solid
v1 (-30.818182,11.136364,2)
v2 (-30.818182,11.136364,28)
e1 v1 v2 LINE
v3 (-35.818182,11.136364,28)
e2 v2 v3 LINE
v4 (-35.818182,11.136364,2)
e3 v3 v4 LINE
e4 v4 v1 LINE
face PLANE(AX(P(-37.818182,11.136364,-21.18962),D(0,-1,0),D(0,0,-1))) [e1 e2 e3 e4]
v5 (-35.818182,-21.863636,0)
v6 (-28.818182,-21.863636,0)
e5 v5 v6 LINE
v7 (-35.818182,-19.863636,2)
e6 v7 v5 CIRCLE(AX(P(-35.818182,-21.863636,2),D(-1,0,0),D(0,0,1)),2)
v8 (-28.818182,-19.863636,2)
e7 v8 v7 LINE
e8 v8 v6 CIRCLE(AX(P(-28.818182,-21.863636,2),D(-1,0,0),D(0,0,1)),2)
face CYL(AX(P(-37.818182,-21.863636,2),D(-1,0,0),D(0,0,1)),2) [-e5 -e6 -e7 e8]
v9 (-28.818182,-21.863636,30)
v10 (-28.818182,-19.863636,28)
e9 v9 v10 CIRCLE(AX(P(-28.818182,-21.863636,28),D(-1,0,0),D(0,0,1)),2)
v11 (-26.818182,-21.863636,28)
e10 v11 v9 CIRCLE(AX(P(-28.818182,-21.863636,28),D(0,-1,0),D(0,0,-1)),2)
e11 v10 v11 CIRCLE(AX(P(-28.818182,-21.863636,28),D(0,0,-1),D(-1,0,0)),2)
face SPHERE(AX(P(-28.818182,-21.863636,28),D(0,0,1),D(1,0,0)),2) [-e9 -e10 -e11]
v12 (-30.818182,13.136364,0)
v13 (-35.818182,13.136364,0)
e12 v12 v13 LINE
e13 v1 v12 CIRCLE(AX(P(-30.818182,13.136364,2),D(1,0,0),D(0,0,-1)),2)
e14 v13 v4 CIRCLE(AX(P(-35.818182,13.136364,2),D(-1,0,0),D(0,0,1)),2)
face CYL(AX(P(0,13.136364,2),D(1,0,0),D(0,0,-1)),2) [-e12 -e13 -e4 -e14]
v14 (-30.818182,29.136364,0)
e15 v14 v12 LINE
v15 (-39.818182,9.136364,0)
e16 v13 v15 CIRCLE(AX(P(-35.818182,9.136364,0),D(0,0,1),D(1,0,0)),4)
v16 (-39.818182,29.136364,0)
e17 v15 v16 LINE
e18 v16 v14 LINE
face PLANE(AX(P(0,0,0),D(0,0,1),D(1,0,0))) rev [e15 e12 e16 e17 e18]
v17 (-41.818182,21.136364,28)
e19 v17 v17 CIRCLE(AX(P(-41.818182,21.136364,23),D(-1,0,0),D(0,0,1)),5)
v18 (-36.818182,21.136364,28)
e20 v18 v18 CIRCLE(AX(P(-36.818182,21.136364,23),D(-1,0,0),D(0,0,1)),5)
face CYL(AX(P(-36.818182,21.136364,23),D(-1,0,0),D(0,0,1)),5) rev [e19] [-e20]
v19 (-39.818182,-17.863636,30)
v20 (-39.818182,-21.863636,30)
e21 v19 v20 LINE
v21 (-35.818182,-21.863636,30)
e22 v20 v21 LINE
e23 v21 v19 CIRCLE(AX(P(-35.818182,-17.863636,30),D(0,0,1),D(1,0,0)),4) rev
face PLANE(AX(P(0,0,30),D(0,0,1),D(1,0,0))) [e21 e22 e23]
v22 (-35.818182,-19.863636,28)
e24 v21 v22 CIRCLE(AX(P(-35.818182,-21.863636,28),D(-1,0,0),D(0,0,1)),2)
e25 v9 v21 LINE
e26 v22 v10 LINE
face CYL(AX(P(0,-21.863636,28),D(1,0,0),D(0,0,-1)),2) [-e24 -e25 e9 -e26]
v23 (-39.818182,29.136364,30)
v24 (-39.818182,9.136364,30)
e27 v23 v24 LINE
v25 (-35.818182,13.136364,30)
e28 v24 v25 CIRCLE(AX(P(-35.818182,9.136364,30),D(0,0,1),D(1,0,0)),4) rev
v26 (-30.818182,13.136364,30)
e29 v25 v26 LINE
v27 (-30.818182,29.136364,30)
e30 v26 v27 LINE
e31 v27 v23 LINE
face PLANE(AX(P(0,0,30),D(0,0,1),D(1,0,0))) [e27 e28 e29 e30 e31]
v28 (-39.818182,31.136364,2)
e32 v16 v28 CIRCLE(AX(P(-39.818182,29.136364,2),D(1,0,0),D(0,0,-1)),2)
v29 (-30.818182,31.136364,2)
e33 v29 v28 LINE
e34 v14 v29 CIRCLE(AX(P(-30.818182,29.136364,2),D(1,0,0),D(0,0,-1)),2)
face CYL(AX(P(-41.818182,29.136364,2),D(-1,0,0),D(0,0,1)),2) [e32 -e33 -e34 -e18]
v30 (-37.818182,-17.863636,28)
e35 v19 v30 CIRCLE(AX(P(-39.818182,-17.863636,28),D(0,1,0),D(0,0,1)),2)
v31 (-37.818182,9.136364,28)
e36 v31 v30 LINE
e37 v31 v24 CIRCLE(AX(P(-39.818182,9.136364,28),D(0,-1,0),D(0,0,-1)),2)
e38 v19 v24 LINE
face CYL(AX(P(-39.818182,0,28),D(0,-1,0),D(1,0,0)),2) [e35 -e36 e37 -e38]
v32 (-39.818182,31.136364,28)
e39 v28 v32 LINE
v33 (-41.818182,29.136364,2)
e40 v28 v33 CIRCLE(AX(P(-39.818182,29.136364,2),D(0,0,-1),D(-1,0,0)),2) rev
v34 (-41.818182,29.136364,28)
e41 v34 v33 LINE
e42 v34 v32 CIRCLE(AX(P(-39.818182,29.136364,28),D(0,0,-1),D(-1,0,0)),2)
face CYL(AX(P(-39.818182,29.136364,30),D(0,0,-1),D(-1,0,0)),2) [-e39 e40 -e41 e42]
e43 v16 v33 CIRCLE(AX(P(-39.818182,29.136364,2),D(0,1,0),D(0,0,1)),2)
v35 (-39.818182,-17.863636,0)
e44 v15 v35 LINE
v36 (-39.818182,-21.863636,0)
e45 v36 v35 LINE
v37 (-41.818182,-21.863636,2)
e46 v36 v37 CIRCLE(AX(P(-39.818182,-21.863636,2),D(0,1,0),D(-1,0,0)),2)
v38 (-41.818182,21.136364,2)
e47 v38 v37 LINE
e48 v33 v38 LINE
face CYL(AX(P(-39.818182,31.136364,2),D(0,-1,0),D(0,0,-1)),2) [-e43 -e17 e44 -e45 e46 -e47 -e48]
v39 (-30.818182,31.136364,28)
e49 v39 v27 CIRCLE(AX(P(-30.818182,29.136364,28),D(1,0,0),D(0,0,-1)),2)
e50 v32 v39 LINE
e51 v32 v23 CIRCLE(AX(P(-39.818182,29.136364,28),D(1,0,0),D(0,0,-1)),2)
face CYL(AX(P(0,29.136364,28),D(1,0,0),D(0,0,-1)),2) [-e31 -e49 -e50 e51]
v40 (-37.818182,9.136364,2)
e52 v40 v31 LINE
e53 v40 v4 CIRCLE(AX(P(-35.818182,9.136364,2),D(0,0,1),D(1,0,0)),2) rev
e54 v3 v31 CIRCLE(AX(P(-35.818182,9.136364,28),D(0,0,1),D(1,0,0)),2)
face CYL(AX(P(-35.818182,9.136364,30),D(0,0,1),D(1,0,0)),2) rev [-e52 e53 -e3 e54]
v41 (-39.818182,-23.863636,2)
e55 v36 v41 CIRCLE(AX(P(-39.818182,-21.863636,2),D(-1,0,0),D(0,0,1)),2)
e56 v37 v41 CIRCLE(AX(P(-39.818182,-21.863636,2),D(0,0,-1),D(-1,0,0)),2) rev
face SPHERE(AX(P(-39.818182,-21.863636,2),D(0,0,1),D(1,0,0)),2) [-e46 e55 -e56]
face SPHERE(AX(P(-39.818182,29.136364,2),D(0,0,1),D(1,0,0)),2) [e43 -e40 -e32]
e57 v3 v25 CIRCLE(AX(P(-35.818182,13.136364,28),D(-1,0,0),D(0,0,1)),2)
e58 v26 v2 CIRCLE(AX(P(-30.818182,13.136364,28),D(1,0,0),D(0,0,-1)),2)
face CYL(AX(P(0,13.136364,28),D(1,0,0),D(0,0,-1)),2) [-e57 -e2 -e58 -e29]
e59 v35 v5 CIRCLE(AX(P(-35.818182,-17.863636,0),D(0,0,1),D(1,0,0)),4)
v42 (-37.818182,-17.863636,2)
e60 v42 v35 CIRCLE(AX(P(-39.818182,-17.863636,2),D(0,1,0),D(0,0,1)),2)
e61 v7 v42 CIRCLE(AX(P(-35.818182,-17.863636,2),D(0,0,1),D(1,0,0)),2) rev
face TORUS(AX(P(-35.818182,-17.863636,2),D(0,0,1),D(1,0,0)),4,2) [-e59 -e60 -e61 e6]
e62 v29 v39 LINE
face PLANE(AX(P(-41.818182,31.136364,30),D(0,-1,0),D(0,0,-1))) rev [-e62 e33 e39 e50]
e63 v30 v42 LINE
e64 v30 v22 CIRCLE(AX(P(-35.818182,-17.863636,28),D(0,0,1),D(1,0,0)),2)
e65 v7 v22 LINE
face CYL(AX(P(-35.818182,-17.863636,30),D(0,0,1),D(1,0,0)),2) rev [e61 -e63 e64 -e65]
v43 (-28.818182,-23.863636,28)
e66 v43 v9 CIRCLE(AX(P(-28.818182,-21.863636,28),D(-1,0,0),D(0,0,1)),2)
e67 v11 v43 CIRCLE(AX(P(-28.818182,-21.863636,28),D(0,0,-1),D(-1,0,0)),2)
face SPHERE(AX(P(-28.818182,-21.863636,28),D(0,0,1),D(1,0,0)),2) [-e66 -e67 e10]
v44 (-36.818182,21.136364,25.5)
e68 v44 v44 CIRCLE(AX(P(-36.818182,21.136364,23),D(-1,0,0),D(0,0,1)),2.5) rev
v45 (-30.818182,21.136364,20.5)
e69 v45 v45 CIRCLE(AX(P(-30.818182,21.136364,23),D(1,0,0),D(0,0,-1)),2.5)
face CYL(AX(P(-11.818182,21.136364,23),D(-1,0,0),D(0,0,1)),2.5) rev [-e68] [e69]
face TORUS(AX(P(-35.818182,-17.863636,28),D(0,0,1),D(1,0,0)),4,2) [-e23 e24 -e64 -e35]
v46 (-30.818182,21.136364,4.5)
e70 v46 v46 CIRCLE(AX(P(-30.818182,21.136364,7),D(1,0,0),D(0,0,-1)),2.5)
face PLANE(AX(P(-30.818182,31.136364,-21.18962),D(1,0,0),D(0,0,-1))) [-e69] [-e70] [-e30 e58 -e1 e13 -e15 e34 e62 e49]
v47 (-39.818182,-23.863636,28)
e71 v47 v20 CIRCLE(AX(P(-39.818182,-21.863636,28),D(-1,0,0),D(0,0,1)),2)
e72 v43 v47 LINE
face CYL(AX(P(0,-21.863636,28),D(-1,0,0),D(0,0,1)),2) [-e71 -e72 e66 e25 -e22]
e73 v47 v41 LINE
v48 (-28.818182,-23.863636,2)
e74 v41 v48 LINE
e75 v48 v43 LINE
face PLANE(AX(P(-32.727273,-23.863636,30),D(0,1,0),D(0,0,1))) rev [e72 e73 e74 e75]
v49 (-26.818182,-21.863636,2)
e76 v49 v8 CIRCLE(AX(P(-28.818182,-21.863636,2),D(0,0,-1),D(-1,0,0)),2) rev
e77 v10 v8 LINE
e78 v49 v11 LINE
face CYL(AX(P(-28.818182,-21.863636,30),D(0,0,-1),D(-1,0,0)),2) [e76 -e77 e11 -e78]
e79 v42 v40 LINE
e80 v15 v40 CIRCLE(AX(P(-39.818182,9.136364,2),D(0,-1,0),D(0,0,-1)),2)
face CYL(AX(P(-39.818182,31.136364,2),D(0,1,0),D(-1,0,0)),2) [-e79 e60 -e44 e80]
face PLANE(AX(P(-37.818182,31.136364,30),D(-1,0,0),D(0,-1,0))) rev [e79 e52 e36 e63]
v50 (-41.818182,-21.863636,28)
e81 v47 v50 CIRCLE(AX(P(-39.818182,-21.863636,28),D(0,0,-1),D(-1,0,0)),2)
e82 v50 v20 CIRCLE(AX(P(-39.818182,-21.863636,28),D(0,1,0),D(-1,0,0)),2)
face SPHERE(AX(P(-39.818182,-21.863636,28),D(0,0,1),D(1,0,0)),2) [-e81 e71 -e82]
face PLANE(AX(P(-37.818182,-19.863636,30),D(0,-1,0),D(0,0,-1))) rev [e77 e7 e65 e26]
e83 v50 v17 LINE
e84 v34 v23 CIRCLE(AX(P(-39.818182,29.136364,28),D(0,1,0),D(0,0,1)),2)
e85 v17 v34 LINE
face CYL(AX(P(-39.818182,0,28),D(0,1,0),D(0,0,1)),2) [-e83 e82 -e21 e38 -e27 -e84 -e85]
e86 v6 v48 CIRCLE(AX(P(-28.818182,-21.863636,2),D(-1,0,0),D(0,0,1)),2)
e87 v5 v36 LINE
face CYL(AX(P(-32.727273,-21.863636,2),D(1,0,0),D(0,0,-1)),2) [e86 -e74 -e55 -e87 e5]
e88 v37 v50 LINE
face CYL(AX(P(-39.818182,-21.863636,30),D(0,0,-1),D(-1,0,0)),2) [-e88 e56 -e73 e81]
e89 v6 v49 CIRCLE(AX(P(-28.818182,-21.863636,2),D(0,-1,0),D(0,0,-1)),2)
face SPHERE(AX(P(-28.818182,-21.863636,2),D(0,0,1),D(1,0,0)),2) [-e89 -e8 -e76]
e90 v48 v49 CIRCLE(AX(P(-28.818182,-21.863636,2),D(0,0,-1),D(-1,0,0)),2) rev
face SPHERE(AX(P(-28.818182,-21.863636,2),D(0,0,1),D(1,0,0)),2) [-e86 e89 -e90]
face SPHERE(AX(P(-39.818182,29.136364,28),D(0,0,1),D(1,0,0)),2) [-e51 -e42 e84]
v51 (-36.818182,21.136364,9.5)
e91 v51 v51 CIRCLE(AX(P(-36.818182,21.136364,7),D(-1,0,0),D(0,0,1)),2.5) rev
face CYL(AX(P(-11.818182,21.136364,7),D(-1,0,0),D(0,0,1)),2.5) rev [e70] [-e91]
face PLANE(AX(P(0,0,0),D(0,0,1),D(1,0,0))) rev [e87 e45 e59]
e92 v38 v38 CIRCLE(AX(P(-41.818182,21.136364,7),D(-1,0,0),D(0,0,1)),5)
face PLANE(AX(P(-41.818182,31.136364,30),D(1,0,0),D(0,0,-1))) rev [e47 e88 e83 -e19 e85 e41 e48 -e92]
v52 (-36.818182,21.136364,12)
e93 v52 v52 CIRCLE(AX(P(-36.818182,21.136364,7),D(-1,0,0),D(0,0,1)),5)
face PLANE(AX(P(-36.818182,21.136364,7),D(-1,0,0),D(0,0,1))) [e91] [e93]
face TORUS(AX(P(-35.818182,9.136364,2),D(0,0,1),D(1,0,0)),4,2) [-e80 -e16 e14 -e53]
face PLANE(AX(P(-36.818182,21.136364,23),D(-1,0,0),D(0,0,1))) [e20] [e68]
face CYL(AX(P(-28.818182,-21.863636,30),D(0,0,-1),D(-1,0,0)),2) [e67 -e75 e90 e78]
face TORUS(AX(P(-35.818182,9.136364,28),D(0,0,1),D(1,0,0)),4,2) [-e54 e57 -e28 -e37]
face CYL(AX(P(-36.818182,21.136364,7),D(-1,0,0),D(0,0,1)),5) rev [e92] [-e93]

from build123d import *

# Parameters (mm, degrees)
EXTRUDE_1_DEPTH     = 30
SKETCH_3_W          = 7
SKETCH_3_H          = 20
EXTRUDE_2_DEPTH     = 30
SKETCH_2_R          = 2.5
CUT_EXTRUDE_1_DEPTH = 30
FILLET_1_R          = 2
FILLET_2_R          = 2
FILLET_3_R          = 2
FILLET_5_R          = 2
SKETCH_4_R          = 5
CUT_EXTRUDE_2_DEPTH = 5


with BuildPart() as part:
    # 스케치1 → 보스-돌출1 (new body)
    with BuildSketch(Plane.XY):
        Polygon((-41.818181818, 31.136363636), (-37.818181818, 31.136363636), (-37.818181818, -19.863636364), (-26.818181818, -19.863636364), (-26.818181818, -23.863636364), (-32.727272727, -23.863636364), (-41.818181818, -23.863636364), align=None)
    extrude(amount=EXTRUDE_1_DEPTH)

    # 스케치3 → 보스-돌출2 (add)
    with BuildSketch(Plane.XY.offset(30)):
        with Locations((-34.318181818, 21.136363636)):
            Rectangle(SKETCH_3_W, SKETCH_3_H)
    extrude(amount=-EXTRUDE_2_DEPTH)

    # 스케치2 → 컷-돌출1 (cut)
    with BuildSketch(Plane.ZY.offset(41.818181818)):
        with Locations((7, 21.136363636)):
            Circle(SKETCH_2_R)
        with Locations((23, 21.136363636)):
            Circle(SKETCH_2_R)
    extrude(amount=-CUT_EXTRUDE_1_DEPTH, mode=Mode.SUBTRACT)

    # 필렛1
    fillet_1_edges = [part.edges().sort_by_distance(p)[0] for p in [
        (-37.818181818, -19.863636364, 15),
        (-37.818181818, 11.136363636, 15),
    ]]
    fillet(fillet_1_edges, radius=FILLET_1_R)

    # 필렛2
    fillet_2_edges = [part.edges().sort_by_distance(p)[0] for p in [
        (-41.818181818, -23.863636364, 15),
    ]]
    fillet(fillet_2_edges, radius=FILLET_2_R)

    # 필렛3
    fillet_3_edges = [part.edges().sort_by_distance(p)[0] for p in [
        (-26.818181818, -23.863636364, 15),
        (-26.818181818, -19.863636364, 15),
        (-41.818181818, 31.136363636, 15),
    ]]
    fillet(fillet_3_edges, radius=FILLET_3_R - 0.0001)  # a hair under: the kernel refuses the full size

    # 필렛5
    fillet_5_edges = [part.edges().sort_by_distance(p)[0] for p in [
        (-35.318231818, 31.136363636, 30),
        (-33.318181818, 11.136363636, 0),
        (-37.818181818, -4.363636364, 0),
        (-37.818181818, -4.363636364, 30),
        (-33.318181818, 11.136363636, 30),
        (-37.232395381, 10.550577199, 30),
        (-37.232395381, 10.550577199, 0),
        (-37.232395381, -19.277849926, 0),
        (-37.232395381, -19.277849926, 30),
        (-34.318131818, -23.863636364, 0),
        (-34.318131818, -23.863636364, 30),
        (-41.232395381, -23.277849926, 0),
        (-41.232395381, -23.277849926, 30),
        (-41.818181818, 3.636413636, 0),
        (-32.318131818, -19.863636364, 0),
        (-41.23242467, 30.550606488, 0),
        (-27.403938966, -20.449393512, 0),
        (-27.403938966, -23.277879215, 0),
        (-41.818181818, 3.636413636, 30),
        (-35.318231818, 31.136363636, 0),
        (-32.318131818, -19.863636364, 30),
        (-41.23242467, 30.550606488, 30),
        (-27.403938966, -20.449393512, 30),
        (-27.403938966, -23.277879215, 30),
    ]]
    fillet(fillet_5_edges, radius=FILLET_5_R - 0.0001)  # a hair under: the kernel refuses the full size

    # 스케치4 → 컷-돌출2 (cut)
    with BuildSketch(Plane.ZY.offset(41.818181818)):
        with Locations((7, 21.136363636)):
            Circle(SKETCH_4_R)
        with Locations((23, 21.136363636)):
            Circle(SKETCH_4_R)
    extrude(amount=-CUT_EXTRUDE_2_DEPTH, mode=Mode.SUBTRACT)


solid = part.part
